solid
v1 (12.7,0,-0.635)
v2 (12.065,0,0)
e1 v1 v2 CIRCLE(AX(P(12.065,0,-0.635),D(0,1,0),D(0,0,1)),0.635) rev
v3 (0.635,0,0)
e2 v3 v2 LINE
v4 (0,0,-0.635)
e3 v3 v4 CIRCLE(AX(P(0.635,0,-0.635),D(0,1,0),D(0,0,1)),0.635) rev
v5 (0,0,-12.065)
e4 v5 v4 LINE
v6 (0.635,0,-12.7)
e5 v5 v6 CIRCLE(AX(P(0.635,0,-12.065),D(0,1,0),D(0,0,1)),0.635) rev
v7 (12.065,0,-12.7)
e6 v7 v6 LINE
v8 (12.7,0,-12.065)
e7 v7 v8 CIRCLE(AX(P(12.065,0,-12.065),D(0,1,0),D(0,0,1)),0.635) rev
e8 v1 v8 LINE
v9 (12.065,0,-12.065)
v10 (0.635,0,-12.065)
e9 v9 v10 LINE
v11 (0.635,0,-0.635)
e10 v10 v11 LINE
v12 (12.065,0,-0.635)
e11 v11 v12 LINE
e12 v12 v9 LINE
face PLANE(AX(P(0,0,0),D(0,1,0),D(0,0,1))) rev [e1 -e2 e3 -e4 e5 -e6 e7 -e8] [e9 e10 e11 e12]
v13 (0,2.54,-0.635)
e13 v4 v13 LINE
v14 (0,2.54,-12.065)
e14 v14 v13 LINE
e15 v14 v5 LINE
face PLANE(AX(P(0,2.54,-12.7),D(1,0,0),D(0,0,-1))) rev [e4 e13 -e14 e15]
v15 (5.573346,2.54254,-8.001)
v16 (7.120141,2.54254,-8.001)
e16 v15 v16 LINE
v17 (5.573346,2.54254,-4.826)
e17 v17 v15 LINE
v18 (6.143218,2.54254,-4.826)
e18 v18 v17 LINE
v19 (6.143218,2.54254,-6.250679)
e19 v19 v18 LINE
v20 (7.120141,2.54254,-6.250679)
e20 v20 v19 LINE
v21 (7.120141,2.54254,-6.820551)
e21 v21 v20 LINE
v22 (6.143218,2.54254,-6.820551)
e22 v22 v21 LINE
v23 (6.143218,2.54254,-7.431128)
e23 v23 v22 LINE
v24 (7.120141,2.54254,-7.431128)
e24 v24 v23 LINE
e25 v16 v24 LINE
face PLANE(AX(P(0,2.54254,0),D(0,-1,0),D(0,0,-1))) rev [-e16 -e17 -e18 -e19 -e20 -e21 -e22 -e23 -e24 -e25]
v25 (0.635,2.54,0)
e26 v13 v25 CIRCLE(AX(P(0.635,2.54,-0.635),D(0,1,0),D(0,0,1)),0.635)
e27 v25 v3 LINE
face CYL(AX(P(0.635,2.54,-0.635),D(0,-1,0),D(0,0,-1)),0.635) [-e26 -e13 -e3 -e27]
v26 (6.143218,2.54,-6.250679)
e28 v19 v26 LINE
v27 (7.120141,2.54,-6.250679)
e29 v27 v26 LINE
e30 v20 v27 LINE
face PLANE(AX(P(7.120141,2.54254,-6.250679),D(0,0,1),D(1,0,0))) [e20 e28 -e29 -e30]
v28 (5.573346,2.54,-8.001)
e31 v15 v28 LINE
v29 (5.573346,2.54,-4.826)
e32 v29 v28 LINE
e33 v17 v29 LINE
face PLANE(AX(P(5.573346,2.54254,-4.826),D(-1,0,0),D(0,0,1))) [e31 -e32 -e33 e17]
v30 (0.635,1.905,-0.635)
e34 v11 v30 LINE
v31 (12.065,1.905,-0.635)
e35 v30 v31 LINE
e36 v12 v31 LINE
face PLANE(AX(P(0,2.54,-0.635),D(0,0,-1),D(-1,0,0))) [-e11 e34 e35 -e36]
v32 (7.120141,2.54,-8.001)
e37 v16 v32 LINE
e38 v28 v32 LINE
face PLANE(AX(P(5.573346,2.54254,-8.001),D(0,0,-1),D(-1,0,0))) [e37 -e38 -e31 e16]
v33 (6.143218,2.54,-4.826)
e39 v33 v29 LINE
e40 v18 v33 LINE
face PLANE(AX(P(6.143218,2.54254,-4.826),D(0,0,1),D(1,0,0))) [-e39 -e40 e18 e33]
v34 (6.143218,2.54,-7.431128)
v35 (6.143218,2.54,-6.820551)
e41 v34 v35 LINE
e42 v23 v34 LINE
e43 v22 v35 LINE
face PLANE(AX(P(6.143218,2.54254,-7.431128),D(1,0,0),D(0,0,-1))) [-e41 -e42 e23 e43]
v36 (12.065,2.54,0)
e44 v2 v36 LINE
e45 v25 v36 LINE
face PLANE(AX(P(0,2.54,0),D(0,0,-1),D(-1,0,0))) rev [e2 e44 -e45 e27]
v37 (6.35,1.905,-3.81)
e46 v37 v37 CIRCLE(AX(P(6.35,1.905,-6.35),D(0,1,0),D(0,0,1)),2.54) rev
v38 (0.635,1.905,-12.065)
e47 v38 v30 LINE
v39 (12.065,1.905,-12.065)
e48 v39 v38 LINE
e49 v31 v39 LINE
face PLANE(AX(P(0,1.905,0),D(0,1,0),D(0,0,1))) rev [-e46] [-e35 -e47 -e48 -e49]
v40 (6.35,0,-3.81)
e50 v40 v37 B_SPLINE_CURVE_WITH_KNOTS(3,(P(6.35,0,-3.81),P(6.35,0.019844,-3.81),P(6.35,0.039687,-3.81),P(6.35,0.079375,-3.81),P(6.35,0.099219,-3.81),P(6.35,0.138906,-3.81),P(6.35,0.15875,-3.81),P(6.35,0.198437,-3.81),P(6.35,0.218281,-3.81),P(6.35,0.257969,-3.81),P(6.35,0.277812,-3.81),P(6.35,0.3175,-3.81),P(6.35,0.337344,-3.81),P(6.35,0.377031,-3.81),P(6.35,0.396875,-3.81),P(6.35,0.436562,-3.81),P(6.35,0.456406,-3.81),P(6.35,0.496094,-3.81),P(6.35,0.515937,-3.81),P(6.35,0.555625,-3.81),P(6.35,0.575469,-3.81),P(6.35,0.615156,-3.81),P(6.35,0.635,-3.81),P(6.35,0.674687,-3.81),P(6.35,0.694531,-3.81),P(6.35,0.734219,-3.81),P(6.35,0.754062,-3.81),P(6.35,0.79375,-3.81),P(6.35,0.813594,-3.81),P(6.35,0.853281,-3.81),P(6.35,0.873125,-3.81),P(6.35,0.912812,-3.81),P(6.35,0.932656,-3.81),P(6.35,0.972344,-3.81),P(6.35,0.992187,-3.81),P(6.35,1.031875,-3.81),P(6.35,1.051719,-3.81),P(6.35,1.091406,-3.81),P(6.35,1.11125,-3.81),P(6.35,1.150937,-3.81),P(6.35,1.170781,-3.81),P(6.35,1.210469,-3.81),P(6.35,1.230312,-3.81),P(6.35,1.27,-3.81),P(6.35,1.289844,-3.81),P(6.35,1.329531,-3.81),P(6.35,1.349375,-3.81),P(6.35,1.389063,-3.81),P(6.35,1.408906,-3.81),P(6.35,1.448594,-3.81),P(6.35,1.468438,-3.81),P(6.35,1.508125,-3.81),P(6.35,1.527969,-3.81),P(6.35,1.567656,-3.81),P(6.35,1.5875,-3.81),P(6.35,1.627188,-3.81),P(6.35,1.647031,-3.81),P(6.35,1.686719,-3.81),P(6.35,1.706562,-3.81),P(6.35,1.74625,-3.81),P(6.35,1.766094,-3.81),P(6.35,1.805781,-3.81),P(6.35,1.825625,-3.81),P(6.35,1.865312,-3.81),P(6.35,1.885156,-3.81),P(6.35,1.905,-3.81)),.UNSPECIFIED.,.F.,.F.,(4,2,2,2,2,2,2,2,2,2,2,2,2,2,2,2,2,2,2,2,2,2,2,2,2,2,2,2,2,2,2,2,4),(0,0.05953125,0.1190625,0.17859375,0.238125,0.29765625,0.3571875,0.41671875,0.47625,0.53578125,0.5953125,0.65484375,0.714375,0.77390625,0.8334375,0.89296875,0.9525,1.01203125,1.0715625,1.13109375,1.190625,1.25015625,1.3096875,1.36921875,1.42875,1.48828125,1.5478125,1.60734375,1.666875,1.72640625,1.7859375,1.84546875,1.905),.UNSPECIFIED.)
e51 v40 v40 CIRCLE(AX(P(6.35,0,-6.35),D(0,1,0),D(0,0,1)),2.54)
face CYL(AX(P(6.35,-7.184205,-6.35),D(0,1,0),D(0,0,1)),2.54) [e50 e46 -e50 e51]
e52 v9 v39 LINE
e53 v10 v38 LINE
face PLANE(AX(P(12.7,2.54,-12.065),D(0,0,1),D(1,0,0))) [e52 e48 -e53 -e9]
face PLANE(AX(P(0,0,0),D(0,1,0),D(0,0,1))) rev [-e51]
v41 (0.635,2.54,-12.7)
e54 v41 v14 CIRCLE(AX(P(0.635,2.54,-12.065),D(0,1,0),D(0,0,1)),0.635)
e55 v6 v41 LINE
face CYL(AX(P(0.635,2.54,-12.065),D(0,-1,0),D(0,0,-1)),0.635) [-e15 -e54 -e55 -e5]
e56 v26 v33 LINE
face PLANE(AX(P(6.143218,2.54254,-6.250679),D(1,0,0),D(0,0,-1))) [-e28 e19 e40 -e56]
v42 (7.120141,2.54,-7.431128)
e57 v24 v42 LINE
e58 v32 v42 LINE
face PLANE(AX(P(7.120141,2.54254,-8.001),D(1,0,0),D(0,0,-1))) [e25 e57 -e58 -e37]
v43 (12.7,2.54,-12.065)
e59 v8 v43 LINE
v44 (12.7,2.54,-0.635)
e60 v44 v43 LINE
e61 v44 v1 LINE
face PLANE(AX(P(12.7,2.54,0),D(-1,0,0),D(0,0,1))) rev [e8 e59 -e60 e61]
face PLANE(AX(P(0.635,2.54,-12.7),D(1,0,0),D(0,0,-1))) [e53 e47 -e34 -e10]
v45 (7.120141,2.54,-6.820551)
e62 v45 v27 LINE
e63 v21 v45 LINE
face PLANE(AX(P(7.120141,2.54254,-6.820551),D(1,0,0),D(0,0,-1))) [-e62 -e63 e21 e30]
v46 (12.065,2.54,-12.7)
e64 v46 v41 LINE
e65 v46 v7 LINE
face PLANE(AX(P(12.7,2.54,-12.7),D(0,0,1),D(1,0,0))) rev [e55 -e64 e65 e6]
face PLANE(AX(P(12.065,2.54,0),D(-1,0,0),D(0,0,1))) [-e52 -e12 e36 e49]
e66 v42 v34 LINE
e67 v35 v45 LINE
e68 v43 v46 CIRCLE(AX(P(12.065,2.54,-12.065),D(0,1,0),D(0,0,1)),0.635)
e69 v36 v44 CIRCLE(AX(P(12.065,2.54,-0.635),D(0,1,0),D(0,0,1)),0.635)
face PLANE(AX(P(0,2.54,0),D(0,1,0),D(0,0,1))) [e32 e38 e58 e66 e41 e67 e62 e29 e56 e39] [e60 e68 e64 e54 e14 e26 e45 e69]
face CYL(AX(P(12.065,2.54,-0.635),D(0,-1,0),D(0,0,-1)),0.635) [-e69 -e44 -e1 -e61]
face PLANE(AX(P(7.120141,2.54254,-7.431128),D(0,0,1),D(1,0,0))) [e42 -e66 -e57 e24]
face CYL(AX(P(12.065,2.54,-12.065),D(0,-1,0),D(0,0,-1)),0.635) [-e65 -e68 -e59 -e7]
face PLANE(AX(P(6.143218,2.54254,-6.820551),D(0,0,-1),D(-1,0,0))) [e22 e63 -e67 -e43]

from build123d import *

# Parameters (mm, degrees)
SKETCH1_W           = 12.7
SKETCH1_H           = 12.7
BOSS_EXTRUDE1_DEPTH = 2.54
FILLET1_R           = 0.635
SHELL1_START        = 0.635
SHELL1_OUTLINE_W    = 1.905
SHELL1_OUTLINE_H    = 11.43
SHELL1_DEPTH        = 11.43
SKETCH2_R           = 2.54
BOSS_EXTRUDE2_DEPTH = 1.905
BOSS_EXTRUDE3_DEPTH = 0.00254


# Read off the part's stored shape, not the designer's step: Shell1
with BuildPart() as part:
    # Sketch1 → Boss-Extrude1 (new body)
    with BuildSketch(Plane(origin=(0, 0, 0), x_dir=(1, 0, 0), z_dir=(0, 1, 0))):
        with Locations((6.35, 6.35)):
            Rectangle(SKETCH1_W, SKETCH1_H)
    extrude(amount=BOSS_EXTRUDE1_DEPTH)

    # Fillet1
    fillet1_edges = [part.edges().sort_by_distance(p)[0] for p in [
        (0, 1.27, -12.7),
        (12.7, 1.27, -12.7),
        (12.7, 1.27, 0),
        (0, 1.27, 0),
    ]]
    fillet(fillet1_edges, radius=FILLET1_R)

    # Shell1 outline → Shell1 (cut)
    with BuildSketch(Plane.YZ.offset(SHELL1_START)):
        with Locations((0.9525, -6.35)):
            Rectangle(SHELL1_OUTLINE_W, SHELL1_OUTLINE_H)
    extrude(amount=SHELL1_DEPTH, mode=Mode.SUBTRACT)

    # Sketch2 → Boss-Extrude2 (add)
    with BuildSketch(Plane(origin=(0, 1.905, 0), x_dir=(-1, 0, 0), z_dir=(0, -1, 0))):
        with Locations(Location((-6.35, 6.35, 0), (0, 0, 270))):
            Circle(SKETCH2_R)
    extrude(amount=BOSS_EXTRUDE2_DEPTH)

    # Sketch3 → Boss-Extrude3 (add)
    with BuildSketch(Plane(origin=(0, 2.54, 0), x_dir=(1, 0, 0), z_dir=(0, 1, 0))):
        Polygon((5.573346154, 8.001), (7.120141026, 8.001), (7.120141026, 7.431128205), (6.143217949, 7.431128205), (6.143217949, 6.820551282), (7.120141026, 6.820551282), (7.120141026, 6.250679487), (6.143217949, 6.250679487), (6.143217949, 4.826), (5.573346154, 4.826), align=None)
    extrude(amount=BOSS_EXTRUDE3_DEPTH)


solid = part.part
